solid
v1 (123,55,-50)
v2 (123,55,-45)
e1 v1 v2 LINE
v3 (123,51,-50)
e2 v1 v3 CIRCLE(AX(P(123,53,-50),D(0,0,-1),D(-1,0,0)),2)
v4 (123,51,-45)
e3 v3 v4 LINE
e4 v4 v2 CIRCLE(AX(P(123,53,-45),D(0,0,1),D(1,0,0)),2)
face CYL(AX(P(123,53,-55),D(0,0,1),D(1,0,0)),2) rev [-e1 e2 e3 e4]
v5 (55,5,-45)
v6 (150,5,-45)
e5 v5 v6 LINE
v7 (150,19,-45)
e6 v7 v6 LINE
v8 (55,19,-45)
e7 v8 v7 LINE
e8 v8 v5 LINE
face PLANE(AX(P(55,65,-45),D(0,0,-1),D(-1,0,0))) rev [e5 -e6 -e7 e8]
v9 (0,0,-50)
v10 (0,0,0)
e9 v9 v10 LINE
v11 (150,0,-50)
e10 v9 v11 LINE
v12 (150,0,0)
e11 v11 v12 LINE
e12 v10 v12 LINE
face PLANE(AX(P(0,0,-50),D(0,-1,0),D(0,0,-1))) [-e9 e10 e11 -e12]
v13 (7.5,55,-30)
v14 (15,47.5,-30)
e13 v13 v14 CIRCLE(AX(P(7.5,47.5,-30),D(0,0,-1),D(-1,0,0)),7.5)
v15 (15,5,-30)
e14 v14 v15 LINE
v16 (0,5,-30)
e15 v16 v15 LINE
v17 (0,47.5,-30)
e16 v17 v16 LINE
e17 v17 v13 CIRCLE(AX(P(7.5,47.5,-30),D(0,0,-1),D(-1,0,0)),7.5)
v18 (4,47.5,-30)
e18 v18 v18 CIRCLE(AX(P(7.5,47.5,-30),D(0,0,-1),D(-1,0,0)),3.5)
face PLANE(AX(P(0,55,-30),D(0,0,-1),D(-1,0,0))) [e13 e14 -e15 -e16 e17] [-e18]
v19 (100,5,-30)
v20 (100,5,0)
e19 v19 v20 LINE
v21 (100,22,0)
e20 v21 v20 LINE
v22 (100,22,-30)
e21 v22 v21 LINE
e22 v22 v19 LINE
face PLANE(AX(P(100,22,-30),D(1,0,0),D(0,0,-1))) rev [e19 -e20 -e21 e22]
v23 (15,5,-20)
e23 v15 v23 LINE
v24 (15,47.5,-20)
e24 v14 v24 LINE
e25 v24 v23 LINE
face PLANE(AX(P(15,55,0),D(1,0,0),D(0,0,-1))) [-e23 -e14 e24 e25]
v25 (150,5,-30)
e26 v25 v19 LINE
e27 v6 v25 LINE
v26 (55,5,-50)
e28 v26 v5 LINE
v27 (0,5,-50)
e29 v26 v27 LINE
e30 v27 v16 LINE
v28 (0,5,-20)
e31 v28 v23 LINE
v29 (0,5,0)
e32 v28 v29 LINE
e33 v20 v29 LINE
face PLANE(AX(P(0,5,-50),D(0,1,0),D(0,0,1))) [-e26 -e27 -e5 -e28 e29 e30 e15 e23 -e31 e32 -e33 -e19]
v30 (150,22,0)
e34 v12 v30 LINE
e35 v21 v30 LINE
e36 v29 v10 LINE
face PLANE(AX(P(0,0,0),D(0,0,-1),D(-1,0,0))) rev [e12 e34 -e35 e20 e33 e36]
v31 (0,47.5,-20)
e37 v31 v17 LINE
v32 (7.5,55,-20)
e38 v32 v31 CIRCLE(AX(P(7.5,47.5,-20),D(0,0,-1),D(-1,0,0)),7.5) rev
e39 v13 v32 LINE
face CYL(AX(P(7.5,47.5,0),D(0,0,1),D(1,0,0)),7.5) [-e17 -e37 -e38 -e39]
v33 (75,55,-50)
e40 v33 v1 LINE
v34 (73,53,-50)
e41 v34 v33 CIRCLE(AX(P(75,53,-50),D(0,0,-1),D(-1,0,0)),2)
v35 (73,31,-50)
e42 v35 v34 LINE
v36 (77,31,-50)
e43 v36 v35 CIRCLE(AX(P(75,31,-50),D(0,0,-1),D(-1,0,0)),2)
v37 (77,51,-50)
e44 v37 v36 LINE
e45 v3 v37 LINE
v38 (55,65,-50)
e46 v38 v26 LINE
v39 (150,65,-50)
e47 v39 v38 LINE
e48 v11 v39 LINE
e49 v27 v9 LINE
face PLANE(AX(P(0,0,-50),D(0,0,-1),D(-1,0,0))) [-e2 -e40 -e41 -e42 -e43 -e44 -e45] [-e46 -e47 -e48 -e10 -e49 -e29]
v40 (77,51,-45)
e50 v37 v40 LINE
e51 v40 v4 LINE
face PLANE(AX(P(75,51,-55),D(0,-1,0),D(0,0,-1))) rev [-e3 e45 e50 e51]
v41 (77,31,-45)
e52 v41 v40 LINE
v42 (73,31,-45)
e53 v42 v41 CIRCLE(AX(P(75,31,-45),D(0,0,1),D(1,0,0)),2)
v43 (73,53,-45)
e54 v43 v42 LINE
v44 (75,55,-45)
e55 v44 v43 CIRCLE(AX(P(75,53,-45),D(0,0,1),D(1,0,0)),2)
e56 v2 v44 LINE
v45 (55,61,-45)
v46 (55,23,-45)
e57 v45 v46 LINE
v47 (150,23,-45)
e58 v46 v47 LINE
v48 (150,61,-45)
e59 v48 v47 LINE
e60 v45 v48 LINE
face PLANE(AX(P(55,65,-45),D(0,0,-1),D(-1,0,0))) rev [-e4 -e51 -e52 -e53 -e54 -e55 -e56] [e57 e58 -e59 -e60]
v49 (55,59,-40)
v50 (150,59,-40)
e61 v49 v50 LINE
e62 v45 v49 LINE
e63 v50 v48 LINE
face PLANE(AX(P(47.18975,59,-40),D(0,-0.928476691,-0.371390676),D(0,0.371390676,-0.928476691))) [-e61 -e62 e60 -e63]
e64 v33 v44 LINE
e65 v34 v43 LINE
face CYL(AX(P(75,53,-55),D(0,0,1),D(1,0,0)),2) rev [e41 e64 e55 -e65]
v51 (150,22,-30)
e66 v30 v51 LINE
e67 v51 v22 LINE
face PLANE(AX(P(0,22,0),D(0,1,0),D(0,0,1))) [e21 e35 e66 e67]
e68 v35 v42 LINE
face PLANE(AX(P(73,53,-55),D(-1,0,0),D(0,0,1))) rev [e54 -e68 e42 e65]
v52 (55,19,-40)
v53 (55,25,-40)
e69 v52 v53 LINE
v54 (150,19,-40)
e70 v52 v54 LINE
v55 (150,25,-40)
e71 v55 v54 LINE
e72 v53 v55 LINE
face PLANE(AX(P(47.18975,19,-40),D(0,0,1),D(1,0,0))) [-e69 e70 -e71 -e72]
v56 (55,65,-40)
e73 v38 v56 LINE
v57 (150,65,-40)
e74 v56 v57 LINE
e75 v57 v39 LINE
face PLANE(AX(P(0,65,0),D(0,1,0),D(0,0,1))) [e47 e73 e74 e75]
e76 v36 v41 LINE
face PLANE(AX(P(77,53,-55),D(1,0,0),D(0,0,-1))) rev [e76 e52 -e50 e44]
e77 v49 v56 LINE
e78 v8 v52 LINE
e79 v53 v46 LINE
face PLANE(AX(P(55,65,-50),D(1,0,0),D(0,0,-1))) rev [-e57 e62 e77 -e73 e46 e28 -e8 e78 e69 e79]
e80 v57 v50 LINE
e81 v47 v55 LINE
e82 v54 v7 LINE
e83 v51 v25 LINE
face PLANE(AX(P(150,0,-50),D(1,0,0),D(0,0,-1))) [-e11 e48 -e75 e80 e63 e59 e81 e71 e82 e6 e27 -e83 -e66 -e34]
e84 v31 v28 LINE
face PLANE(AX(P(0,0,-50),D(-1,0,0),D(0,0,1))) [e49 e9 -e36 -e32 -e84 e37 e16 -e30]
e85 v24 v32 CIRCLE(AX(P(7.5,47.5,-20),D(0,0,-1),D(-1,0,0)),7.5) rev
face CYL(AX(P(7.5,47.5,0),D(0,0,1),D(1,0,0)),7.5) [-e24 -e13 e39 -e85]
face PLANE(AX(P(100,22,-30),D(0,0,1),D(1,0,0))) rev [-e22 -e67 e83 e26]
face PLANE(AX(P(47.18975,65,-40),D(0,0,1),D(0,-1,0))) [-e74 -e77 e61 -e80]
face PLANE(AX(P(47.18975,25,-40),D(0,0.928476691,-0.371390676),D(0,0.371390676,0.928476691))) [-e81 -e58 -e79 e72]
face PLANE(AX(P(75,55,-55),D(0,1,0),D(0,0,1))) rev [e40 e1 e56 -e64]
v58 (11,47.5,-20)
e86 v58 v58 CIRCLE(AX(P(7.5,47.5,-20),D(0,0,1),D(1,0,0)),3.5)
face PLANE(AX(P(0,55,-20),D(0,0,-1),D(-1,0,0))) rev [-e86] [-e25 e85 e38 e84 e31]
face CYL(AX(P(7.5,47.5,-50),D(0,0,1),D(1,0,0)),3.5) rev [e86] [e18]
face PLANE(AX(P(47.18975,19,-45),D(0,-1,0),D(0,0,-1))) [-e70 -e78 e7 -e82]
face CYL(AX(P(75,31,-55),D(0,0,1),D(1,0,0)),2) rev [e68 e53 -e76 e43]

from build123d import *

# Parameters (mm, degrees)
SKETCH1_W           = 150
SKETCH1_H           = 5
BOSS_EXTRUDE1_DEPTH = 50
SKETCH2_W           = 15
SKETCH2_H           = 10
BOSS_EXTRUDE2_DEPTH = 50
SKETCH3_W           = 95
SKETCH3_H           = 5
BOSS_EXTRUDE3_DEPTH = 60
SKETCH4_W           = 50
SKETCH4_H           = 30
BOSS_EXTRUDE4_DEPTH = 17
BOSS_EXTRUDE5_DEPTH = 95
FILLET1_R           = 7.5
SKETCH6_R           = 3.5
CUT_EXTRUDE1_DEPTH  = 30
CUT_EXTRUDE2_DEPTH  = 10
CUT_EXTRUDE3_DEPTH  = 10
SCALE1_SCALE        = 2
SCALE4_SCALE        = 0.5


with BuildPart() as part:
    # Sketch1 → Boss-Extrude1 (new body)
    with BuildSketch(Plane.XY):
        with Locations((75, 2.5)):
            Rectangle(SKETCH1_W, SKETCH1_H)
    extrude(amount=-BOSS_EXTRUDE1_DEPTH)

    # Sketch2 → Boss-Extrude2 (add)
    with BuildSketch(Plane(origin=(0, 5, 0), x_dir=(1, 0, 0), z_dir=(0, 1, 0))):
        with Locations((7.5, 25)):
            Rectangle(SKETCH2_W, SKETCH2_H)
    extrude(amount=BOSS_EXTRUDE2_DEPTH)

    # Sketch3 → Boss-Extrude3 (add)
    with BuildSketch(Plane(origin=(0, 5, 0), x_dir=(1, 0, 0), z_dir=(0, 1, 0))):
        with Locations((102.5, 47.5)):
            Rectangle(SKETCH3_W, SKETCH3_H)
    extrude(amount=BOSS_EXTRUDE3_DEPTH)

    # Sketch4 → Boss-Extrude4 (add)
    with BuildSketch(Plane(origin=(0, 5, 0), x_dir=(1, 0, 0), z_dir=(0, 1, 0))):
        with Locations((125, 15)):
            Rectangle(SKETCH4_W, SKETCH4_H)
    extrude(amount=BOSS_EXTRUDE4_DEPTH)

    # Sketch5 → Boss-Extrude5 (add)
    with BuildSketch(Plane(origin=(150, 0, 0), x_dir=(0, 0, -1), z_dir=(1, 0, 0))):
        Polygon((45, 65), (40, 65), (40, 59), (45, 61), align=None)
        Polygon((45, 19), (40, 19), (40, 25), (45, 23), align=None)
    extrude(amount=-BOSS_EXTRUDE5_DEPTH)

    # Fillet1
    fillet1_edges = [part.edges().sort_by_distance(p)[0] for p in [
        (15, 55, -25),
        (0, 55, -25),
    ]]
    fillet(fillet1_edges, radius=FILLET1_R - 0.0001)  # a hair under: the kernel refuses the full size

    # Sketch6 → Cut-Extrude1 (cut)
    with BuildSketch(Plane.XY.offset(-20)):
        with Locations((7.5, 47.5)):
            Circle(SKETCH6_R)
    extrude(amount=-CUT_EXTRUDE1_DEPTH, mode=Mode.SUBTRACT)

    # Sketch7 → Cut-Extrude2 (cut)
    with BuildSketch(Plane.XY.offset(-45)):
        with BuildLine():
            Line((75, 55), (123, 55))
            ThreePointArc((123, 55), (125, 53), (123, 51))
            Line((123, 51), (75, 51))
            ThreePointArc((75, 51), (73, 53), (75, 55))
        make_face()
    extrude(amount=-CUT_EXTRUDE2_DEPTH, mode=Mode.SUBTRACT)

    # Sketch8 → Cut-Extrude3 (cut)
    with BuildSketch(Plane.XY.offset(-45)):
        with BuildLine():
            Line((77, 53), (77, 31))
            ThreePointArc((77, 31), (75, 29), (73, 31))
            Line((73, 31), (73, 53))
            ThreePointArc((73, 53), (75, 55), (77, 53))
        make_face()
    extrude(amount=-CUT_EXTRUDE3_DEPTH, mode=Mode.SUBTRACT)


with BuildPart() as part_1:
    # Scale1: scaled about (91.729979694, 17.282886664, -29.286286863)
    add(part.part.scale(SCALE1_SCALE).moved(Location((-91.729979694, -17.282886664, 29.286286863))))


with BuildPart() as part_2:
    # Scale4: scaled about (91.729979694, 17.282886664, -29.286286864)
    add(part_1.part.scale(SCALE4_SCALE).moved(Location((45.864989847, 8.641443332, -14.643143432))))


solid = part_2.part
